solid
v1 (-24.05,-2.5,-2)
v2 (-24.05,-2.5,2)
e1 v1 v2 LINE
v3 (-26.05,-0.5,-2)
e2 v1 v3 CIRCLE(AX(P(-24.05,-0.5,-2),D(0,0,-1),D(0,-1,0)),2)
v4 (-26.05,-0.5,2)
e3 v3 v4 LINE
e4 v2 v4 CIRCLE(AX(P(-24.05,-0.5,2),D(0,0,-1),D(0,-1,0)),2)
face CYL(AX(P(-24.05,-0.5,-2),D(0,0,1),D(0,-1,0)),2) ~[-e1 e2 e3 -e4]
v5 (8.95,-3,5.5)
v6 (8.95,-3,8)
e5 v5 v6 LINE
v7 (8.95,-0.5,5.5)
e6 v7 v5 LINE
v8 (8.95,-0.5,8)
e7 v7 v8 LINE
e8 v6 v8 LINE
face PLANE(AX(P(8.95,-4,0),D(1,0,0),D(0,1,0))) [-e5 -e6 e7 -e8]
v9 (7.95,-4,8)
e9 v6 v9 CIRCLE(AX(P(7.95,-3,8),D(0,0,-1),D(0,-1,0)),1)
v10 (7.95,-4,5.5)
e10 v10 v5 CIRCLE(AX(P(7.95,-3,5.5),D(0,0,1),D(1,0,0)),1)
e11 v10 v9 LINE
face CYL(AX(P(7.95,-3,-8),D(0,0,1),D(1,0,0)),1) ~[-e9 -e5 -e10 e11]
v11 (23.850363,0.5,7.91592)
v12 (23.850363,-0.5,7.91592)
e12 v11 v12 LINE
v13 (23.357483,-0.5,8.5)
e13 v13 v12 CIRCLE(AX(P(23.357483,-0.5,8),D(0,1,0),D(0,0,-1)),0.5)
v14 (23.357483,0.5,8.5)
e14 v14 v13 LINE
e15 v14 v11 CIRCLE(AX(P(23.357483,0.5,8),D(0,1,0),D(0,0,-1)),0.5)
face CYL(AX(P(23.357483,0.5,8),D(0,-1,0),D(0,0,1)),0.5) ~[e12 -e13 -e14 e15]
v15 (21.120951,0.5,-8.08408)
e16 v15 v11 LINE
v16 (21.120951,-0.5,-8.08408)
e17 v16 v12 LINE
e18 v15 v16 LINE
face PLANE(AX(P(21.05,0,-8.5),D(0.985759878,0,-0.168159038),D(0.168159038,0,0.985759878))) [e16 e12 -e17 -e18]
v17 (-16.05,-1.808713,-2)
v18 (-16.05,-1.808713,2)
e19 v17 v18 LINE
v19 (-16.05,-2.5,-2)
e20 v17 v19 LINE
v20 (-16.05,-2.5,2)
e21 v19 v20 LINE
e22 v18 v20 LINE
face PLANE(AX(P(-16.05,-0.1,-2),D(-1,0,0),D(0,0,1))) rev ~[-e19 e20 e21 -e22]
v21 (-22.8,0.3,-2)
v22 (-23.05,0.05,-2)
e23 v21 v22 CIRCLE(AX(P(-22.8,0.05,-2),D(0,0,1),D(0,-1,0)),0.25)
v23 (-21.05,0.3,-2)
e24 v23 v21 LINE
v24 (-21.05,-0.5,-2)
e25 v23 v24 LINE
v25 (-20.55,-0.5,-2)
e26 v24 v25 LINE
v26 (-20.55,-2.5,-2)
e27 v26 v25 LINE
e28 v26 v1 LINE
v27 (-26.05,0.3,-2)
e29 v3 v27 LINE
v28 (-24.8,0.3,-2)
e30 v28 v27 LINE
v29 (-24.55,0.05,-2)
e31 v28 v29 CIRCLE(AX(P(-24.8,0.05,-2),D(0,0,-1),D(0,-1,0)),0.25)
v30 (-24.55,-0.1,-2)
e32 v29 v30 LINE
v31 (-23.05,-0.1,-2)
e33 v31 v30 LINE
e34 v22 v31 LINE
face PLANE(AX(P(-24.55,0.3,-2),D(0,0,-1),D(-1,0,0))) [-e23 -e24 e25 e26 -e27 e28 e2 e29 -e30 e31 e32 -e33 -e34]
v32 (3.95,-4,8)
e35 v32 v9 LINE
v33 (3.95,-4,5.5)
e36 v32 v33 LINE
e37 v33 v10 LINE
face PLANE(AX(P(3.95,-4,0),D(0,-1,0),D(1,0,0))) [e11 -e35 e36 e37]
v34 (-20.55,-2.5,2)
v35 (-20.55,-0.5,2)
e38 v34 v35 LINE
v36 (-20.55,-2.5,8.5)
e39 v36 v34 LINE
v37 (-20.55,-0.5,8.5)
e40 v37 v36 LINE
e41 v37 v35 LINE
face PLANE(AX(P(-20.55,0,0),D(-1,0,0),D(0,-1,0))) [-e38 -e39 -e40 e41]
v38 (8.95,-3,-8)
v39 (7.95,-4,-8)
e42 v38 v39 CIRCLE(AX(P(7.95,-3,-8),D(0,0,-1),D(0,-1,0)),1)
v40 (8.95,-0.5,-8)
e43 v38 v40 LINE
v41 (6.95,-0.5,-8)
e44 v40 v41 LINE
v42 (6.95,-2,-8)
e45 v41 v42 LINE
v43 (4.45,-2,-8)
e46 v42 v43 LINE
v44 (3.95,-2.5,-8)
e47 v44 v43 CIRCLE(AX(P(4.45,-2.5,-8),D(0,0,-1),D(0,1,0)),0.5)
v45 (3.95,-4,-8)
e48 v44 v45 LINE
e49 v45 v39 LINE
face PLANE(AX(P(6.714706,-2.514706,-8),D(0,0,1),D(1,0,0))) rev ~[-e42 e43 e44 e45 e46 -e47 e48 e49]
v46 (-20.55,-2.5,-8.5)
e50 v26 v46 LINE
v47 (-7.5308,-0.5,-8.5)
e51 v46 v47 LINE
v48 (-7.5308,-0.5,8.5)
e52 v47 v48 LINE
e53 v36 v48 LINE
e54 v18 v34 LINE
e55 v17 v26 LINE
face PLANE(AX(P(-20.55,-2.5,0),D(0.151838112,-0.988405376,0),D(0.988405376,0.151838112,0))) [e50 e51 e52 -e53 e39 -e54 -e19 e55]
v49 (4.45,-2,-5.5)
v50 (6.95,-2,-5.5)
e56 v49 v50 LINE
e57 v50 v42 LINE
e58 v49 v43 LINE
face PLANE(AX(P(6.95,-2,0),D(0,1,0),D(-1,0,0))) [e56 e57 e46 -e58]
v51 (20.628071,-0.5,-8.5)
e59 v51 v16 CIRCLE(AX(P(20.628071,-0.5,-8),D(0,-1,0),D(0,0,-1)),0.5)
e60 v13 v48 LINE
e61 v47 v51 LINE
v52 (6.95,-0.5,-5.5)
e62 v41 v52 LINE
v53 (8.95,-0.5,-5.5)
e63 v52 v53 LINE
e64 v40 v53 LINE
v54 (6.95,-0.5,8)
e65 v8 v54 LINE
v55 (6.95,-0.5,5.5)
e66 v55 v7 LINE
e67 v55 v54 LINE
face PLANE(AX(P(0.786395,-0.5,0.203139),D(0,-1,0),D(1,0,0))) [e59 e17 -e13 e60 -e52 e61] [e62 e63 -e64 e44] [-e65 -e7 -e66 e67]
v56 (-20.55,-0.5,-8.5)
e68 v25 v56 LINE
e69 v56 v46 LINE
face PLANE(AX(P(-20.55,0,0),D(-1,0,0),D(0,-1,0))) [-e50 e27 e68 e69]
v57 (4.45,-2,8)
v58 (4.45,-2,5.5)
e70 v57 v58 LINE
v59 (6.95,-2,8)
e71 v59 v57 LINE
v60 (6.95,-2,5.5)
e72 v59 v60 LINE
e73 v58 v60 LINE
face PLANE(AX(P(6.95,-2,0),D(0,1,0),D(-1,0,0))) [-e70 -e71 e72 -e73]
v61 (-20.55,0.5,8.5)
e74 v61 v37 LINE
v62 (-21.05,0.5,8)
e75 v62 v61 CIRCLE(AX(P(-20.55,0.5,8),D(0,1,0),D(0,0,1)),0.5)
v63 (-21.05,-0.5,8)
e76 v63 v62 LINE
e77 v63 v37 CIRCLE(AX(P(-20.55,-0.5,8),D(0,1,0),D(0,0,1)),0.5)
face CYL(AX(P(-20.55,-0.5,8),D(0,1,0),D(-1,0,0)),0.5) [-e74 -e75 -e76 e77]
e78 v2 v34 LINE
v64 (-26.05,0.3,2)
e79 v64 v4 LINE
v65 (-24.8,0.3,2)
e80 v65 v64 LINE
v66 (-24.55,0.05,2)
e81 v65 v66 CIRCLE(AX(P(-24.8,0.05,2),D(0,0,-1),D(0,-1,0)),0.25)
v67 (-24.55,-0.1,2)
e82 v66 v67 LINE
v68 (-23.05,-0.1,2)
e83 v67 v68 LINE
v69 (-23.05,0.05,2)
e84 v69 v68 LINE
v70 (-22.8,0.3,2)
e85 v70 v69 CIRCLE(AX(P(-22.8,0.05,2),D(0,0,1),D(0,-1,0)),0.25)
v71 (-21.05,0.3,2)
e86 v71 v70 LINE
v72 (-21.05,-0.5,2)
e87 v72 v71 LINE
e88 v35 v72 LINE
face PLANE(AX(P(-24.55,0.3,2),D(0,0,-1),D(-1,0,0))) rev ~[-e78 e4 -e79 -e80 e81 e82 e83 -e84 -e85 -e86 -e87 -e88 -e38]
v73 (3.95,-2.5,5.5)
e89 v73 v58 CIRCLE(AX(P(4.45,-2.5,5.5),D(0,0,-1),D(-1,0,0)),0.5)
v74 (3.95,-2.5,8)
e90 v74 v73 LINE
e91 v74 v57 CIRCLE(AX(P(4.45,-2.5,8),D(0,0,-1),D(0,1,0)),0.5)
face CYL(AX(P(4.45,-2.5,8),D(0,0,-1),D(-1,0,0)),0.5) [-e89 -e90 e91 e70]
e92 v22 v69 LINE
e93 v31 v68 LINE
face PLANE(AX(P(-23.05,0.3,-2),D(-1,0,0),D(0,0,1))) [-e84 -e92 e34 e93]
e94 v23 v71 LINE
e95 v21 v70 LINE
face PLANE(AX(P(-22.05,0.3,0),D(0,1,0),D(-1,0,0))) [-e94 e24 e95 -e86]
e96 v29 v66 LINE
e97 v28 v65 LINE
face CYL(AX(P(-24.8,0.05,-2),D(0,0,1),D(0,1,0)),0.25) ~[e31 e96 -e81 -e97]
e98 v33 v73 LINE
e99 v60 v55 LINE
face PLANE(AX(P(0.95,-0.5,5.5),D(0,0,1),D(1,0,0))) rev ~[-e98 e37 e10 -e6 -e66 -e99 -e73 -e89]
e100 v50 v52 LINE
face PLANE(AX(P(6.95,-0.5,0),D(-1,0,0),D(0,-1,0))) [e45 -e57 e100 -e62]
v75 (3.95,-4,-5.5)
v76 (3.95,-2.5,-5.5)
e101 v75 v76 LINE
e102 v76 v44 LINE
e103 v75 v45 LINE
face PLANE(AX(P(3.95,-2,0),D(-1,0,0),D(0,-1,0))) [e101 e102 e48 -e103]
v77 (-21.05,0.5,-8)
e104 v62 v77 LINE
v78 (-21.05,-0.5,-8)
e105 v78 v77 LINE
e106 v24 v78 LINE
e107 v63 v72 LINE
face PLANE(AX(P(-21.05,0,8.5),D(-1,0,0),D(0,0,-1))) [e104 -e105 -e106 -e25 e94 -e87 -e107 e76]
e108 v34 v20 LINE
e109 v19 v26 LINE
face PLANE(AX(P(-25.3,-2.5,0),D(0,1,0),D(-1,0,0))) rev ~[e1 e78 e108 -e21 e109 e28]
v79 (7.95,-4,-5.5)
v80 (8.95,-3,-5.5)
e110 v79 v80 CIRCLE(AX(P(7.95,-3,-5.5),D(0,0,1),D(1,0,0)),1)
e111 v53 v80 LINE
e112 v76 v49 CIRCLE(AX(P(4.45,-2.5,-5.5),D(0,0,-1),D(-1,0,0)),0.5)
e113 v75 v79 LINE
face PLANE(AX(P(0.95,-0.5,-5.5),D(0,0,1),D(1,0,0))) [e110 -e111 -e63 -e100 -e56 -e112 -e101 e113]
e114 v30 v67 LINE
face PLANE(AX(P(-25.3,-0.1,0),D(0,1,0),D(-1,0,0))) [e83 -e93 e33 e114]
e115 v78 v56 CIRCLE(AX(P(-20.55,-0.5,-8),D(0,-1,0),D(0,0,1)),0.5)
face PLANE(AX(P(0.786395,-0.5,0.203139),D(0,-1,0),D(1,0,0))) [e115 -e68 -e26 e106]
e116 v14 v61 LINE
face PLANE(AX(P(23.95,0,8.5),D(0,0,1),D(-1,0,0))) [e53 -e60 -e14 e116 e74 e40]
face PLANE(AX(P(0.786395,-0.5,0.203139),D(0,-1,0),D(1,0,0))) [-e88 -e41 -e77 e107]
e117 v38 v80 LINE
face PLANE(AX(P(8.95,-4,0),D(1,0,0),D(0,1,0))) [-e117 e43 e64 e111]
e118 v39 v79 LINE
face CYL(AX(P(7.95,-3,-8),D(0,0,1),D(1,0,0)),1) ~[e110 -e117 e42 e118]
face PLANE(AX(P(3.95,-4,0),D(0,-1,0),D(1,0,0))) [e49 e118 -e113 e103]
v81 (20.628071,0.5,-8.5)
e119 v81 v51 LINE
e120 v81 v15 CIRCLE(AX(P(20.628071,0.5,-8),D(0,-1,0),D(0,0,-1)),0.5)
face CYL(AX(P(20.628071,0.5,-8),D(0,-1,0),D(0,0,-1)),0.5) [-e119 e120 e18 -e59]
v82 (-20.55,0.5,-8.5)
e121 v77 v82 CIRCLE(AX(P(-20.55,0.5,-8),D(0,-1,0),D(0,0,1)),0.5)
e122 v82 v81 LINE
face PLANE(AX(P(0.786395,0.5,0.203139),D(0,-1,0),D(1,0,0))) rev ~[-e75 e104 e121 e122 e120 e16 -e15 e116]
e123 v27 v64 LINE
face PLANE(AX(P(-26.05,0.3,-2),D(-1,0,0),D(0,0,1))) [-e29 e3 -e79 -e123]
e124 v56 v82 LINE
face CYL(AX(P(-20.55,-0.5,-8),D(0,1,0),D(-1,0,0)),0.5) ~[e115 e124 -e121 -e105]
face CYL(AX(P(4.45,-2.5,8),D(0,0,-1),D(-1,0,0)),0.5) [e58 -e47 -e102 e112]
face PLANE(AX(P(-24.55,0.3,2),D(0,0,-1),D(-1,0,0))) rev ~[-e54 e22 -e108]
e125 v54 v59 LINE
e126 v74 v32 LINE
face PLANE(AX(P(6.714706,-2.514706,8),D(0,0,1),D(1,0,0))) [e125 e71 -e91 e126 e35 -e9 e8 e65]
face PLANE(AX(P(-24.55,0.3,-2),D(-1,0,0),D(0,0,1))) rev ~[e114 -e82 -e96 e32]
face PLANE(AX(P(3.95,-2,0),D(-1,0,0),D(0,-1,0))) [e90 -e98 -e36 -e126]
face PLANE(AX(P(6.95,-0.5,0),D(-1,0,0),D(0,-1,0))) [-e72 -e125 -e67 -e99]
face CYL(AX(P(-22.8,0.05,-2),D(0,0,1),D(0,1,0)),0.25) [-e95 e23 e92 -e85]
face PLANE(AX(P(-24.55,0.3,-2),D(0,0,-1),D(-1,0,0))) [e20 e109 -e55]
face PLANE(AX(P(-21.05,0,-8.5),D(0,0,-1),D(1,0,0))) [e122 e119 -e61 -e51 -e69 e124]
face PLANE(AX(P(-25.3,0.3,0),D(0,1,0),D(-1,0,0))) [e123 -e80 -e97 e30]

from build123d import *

# Parameters (mm, degrees)
F0_W      = 14
F0_H      = 11
F1_DEPTH  = 0.5
F3_START  = -0.6
F2_W      = 1.5
F2_H      = 4
F2_W_2    = 2
F2_W_3    = 5
F3_DEPTH  = 2.4
F5_START  = -0.2
F5_DEPTH  = 0.4
F6_DEPTH  = 8
F7_R      = 0.5
F8_R      = 1
F9_R      = 0.5
F10_R     = 2
F11_R     = 0.25
F12_START = 0.5
F12_DEPTH = 3.5
F14_DEPTH = 8.5


# Not quite as in the source:
# - a feature names something its author has since deleted; it is built from what else it names


with BuildPart() as f1:
    # F0 (on Front) → F1 (new body, symmetric)
    with BuildSketch(Plane.XZ):
        Polygon((-21.05, -8.5), (21.05, -8.5), (23.95, 8.5), (-21.05, 8.5), align=None)
        with Locations((7.95, 0)):
            Rectangle(F0_W, F0_H, mode=Mode.SUBTRACT)
        with Locations((7.95, 0)):
            Rectangle(F0_W, F0_H)
    extrude(amount=F1_DEPTH, both=True)

    # F2 (on face) → F3 (join)
    with BuildSketch(Plane(origin=(0, 0.5, 0), x_dir=(-1, 0, 0), z_dir=(0, 1, 0)).offset(F3_START)):
        with Locations((25.3, 0)):
            Rectangle(F2_W, F2_H)
        with Locations((22.05, 0)):
            Rectangle(F2_W_2, F2_H)
        with Locations((23.8, 0)):
            Rectangle(F2_W, F2_H)
        with Locations((18.55, 0)):
            Rectangle(F2_W_3, F2_H)
    extrude(amount=-F3_DEPTH)

    # F2 (on face) → F5 (join)
    with BuildSketch(Plane(origin=(0, 0.5, 0), x_dir=(-1, 0, 0), z_dir=(0, 1, 0)).offset(F5_START)):
        with Locations((25.3, 0)):
            Rectangle(F2_W, F2_H)
        with Locations((22.05, 0)):
            Rectangle(F2_W_2, F2_H)
    extrude(amount=-F5_DEPTH)

    # F4 (on Top) → F6 (join, symmetric)
    with BuildSketch(Plane.XY):
        Polygon((3.95, -4), (8.95, -4), (8.95, -0.5), (6.95, -0.5), (6.95, -2), (3.95, -2), align=None)
    extrude(amount=F6_DEPTH, both=True)

    # F7
    f7_edges = [f1.edges().sort_by_distance(p)[0] for p in [
        (-21.05, 0, 8.5),
        (-21.05, 0, -8.5),
        (23.95, 0, 8.5),
        (21.05, 0, -8.5),
    ]]
    fillet(f7_edges, radius=F7_R)

    # F8
    f8_edges = [f1.edges().sort_by_distance(p)[0] for p in [
        (8.95, -4, 0),
    ]]
    fillet(f8_edges, radius=F8_R)

    # F9
    f9_edges = [f1.edges().sort_by_distance(p)[0] for p in [
        (3.95, -2, 0),
    ]]
    fillet(f9_edges, radius=F9_R)

    # F10
    f10_edges = [f1.edges().sort_by_distance(p)[0] for p in [
        (-26.05, -2.5, 0),
    ]]
    fillet(f10_edges, radius=F10_R)

    # F11
    f11_edges = [f1.edges().sort_by_distance(p)[0] for p in [
        (-24.55, 0.3, 0),
        (-23.05, 0.3, 0),
    ]]
    fillet(f11_edges, radius=F11_R)

    # F0 (on Front) → F12 (cut)
    with BuildSketch(Plane.XZ.offset(F12_START)):
        with Locations((7.95, 0)):
            Rectangle(F0_W, F0_H)
    extrude(amount=F12_DEPTH, mode=Mode.SUBTRACT)

    # F13 (on Top) → F14 (join, symmetric)
    with BuildSketch(Plane.XY):
        Polygon((-4.276, 0), (-20.55, 0), (-20.55, -2.5), align=None)
    extrude(amount=F14_DEPTH, both=True)


solid = f1.part
